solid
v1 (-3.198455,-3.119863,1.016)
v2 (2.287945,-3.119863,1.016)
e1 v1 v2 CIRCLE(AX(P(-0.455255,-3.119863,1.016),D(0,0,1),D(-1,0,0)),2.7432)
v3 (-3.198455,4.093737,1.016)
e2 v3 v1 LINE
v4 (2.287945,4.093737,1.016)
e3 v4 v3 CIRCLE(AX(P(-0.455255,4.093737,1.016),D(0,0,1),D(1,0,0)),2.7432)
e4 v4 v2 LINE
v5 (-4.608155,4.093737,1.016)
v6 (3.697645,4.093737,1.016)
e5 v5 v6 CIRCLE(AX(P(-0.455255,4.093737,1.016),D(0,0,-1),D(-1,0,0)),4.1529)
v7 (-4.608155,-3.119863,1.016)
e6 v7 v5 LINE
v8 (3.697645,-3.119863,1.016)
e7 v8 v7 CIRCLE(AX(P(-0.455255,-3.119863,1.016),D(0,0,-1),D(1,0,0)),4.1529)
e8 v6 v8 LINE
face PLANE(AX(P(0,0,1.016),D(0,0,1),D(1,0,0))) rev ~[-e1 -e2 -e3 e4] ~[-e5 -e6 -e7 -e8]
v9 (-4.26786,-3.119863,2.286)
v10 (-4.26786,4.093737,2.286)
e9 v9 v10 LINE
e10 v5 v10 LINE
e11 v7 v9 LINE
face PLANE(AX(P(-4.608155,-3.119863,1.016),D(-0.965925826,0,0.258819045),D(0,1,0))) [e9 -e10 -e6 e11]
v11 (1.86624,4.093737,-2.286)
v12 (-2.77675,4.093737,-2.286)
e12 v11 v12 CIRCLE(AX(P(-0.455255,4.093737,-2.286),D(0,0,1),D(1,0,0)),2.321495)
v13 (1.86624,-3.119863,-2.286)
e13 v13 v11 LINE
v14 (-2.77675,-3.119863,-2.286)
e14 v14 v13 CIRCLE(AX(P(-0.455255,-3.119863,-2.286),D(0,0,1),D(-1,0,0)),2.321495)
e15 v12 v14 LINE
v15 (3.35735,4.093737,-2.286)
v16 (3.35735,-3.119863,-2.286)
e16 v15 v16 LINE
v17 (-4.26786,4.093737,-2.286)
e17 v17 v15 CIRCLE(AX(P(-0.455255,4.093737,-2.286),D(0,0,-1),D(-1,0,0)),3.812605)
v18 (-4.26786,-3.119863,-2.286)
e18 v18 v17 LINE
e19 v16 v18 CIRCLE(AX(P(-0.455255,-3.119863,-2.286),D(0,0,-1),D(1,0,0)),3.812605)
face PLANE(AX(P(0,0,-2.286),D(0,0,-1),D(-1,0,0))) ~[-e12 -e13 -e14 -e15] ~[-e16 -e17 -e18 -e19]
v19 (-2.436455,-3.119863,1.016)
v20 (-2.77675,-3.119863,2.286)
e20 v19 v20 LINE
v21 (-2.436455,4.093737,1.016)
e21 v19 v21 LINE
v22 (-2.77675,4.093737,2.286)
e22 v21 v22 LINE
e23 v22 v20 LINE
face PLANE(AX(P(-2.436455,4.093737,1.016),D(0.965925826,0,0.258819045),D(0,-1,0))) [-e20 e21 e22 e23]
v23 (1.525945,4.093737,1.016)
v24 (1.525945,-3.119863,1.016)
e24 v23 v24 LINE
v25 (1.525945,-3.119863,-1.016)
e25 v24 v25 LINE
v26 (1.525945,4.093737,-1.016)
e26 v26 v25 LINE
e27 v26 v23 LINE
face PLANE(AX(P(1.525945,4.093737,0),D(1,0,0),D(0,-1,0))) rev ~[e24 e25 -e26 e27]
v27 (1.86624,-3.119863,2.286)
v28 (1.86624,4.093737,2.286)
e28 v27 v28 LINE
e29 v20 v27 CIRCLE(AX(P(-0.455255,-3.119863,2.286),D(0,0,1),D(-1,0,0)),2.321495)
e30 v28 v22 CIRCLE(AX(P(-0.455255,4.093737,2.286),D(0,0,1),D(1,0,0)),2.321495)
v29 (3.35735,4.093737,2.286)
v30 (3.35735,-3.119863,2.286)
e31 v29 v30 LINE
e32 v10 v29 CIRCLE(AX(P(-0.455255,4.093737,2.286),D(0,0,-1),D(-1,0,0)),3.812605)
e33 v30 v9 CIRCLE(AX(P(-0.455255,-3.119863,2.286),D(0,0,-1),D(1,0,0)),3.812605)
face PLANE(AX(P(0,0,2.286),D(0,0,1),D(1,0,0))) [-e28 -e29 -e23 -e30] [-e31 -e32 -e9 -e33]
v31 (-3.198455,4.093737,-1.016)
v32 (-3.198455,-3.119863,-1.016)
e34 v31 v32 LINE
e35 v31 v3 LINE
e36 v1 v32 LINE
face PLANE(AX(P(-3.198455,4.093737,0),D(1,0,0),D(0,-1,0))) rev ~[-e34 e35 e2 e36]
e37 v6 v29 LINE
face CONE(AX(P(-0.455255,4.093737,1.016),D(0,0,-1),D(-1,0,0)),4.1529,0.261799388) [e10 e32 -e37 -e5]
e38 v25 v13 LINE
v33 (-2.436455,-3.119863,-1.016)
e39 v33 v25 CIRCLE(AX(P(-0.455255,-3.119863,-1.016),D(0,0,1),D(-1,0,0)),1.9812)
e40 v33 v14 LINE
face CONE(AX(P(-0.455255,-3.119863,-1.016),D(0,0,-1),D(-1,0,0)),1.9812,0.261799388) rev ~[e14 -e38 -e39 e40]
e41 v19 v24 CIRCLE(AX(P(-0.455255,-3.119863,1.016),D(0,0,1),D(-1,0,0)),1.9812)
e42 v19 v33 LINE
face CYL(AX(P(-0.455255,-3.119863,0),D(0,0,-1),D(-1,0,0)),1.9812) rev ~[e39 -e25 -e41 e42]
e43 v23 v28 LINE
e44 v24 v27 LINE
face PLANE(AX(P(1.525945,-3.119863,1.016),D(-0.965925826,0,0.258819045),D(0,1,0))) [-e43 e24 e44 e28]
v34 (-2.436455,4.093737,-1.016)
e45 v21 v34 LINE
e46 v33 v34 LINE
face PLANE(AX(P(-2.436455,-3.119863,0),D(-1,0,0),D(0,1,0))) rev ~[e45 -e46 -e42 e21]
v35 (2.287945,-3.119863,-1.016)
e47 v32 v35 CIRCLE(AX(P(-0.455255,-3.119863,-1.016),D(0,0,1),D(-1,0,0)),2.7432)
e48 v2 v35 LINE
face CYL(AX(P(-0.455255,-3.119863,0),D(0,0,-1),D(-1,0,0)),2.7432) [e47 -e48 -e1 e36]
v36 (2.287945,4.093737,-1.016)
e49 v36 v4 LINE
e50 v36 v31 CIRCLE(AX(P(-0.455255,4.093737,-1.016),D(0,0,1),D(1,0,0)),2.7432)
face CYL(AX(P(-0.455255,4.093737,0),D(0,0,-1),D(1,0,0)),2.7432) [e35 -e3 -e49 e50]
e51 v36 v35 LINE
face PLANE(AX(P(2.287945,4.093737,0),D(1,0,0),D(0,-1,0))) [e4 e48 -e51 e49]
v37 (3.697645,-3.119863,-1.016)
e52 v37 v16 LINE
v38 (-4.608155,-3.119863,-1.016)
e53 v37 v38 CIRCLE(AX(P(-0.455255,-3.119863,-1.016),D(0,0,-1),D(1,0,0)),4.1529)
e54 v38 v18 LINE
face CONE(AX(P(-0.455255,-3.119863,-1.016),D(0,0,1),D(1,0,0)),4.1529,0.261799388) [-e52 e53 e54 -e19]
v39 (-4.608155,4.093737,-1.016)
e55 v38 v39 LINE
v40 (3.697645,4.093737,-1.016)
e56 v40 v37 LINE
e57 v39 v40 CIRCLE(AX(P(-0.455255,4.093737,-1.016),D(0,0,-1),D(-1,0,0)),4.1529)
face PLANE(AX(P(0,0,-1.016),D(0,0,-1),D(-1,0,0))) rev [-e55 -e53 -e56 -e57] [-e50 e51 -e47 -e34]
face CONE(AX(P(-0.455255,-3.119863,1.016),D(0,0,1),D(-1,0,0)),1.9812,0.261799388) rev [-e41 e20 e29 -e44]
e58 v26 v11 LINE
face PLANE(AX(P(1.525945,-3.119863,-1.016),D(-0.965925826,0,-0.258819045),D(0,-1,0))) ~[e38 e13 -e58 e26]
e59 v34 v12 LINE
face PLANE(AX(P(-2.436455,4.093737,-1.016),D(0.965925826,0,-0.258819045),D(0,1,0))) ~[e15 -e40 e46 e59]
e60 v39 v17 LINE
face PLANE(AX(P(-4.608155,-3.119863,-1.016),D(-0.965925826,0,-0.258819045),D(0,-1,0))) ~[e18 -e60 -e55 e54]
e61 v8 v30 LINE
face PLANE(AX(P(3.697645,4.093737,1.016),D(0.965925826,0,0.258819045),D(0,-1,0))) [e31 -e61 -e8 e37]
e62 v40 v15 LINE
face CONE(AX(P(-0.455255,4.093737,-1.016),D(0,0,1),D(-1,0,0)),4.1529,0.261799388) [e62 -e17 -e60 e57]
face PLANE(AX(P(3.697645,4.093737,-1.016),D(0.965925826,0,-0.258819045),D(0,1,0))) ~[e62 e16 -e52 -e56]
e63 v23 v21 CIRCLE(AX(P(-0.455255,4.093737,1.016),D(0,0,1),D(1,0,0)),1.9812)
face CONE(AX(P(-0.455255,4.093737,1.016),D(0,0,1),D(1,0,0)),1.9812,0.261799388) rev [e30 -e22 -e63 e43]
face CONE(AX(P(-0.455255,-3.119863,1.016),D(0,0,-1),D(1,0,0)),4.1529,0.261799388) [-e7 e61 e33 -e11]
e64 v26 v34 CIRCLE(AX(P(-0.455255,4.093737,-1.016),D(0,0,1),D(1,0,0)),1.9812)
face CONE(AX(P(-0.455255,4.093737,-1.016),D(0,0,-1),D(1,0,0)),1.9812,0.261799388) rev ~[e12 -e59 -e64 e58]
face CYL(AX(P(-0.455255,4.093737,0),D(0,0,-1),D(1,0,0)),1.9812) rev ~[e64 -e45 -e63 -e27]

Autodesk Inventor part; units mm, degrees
ref_plane "YZ Plane" through (0, 0, 0) normal (1, 0, 0) x (0, 1, 0)
ref_plane "XZ Plane" through (0, 0, 0) normal (0, 1, 0) x (-1, 0, 0)
ref_plane "XY Plane" through (0, 0, 0) normal (0, 0, 1) x (1, 0, 0)
sketch "Sketch1" plane through (0, 0, 0) normal (0, 0, 1) x (1, 0, 0)
  arc A0 (2.287945, 4.093737) -> (-3.198455, 4.093737) centre (-0.455255, 4.093737) ccw
  arc A1 (-3.198455, -3.119863) -> (2.287945, -3.119863) centre (-0.455255, -3.119863) ccw
  line L0 (-3.198455, 4.093737) -> (-3.198455, -3.119863)
  line L1 (2.287945, 4.093737) -> (2.287945, -3.119863)
  arc A2 (1.525945, 4.093737) -> (-2.436455, 4.093737) centre (-0.455255, 4.093737) ccw
  line L2 (1.525945, 4.093737) -> (1.525945, -3.119863)
  arc A3 (-2.436455, -3.119863) -> (1.525945, -3.119863) centre (-0.455255, -3.119863) ccw
  line L3 (-2.436455, -3.119863) -> (-2.436455, 4.093737)
  point P0 (0, 0)
  dimension "d0" = 5.4864
  dimension "d1" = 5.4864
  dimension "d3" = 12.7
  dimension "d4" = 0.762
extrude "Extrusion1" add sketch "Sketch1" along normal mid plane 2.032
sketch "Sketch2" plane through (0, 0, 1.016) normal (0, 0, 1) x (1, 0, 0)
  line L0 (1.525945, -3.119863) -> (1.525945, 4.093737)
  arc A0 (1.525945, 4.093737) -> (-2.436455, 4.093737) centre (-0.455255, 4.093737) ccw
  line L1 (-2.436455, 4.093737) -> (-2.436455, -3.119863)
  arc A1 (-2.436455, -3.119863) -> (1.525945, -3.119863) centre (-0.455255, -3.119863) ccw
  line L2 (2.287945, 4.093737) -> (2.287945, -3.119863)
  arc A2 (-3.198455, -3.119863) -> (2.287945, -3.119863) centre (-0.455255, -3.119863) ccw
  line L3 (-3.198455, -3.119863) -> (-3.198455, 4.093737)
  arc A3 (2.287945, 4.093737) -> (-3.198455, 4.093737) centre (-0.455255, 4.093737) ccw
  arc A4 (3.697645, 4.093737) -> (-4.608155, 4.093737) centre (-0.455255, 4.093737) ccw
  line L4 (3.697645, 4.093737) -> (3.697645, -3.119863)
  arc A5 (-4.608155, -3.119863) -> (3.697645, -3.119863) centre (-0.455255, -3.119863) ccw
  line L5 (-4.608155, -3.119863) -> (-4.608155, 4.093737)
  point P0 (0, 0)
  dimension "d7" = 8.3058
sketch "Sketch2 outline for Extrusion2" plane through (0, 0, 1.016) normal (0, 0, 1) x (1, 0, 0)
  arc A0 (-4.608155, 4.093737) -> (3.697645, 4.093737) centre (-0.455255, 4.093737) cw
  line L0 (-4.608155, -3.119863) -> (-4.608155, 4.093737)
  line L1 (3.697645, 4.093737) -> (3.697645, -3.119863)
  arc A1 (3.697645, -3.119863) -> (-4.608155, -3.119863) centre (-0.455255, -3.119863) cw
  arc A2 (-2.436455, -3.119863) -> (1.525945, -3.119863) centre (-0.455255, -3.119863) ccw
  line L2 (1.525945, -3.119863) -> (1.525945, 4.093737)
  arc A3 (1.525945, 4.093737) -> (-2.436455, 4.093737) centre (-0.455255, 4.093737) ccw
  line L3 (-2.436455, 4.093737) -> (-2.436455, -3.119863)
extrude "Extrusion2" add sketch "Sketch2 outline for Extrusion2" along normal blind 1.27 draft -15
mirror "Mirror1" about plane through (0, 0, 0) normal (0, 0, 1) of "Extrusion2"
properties part number "Nibblets"
